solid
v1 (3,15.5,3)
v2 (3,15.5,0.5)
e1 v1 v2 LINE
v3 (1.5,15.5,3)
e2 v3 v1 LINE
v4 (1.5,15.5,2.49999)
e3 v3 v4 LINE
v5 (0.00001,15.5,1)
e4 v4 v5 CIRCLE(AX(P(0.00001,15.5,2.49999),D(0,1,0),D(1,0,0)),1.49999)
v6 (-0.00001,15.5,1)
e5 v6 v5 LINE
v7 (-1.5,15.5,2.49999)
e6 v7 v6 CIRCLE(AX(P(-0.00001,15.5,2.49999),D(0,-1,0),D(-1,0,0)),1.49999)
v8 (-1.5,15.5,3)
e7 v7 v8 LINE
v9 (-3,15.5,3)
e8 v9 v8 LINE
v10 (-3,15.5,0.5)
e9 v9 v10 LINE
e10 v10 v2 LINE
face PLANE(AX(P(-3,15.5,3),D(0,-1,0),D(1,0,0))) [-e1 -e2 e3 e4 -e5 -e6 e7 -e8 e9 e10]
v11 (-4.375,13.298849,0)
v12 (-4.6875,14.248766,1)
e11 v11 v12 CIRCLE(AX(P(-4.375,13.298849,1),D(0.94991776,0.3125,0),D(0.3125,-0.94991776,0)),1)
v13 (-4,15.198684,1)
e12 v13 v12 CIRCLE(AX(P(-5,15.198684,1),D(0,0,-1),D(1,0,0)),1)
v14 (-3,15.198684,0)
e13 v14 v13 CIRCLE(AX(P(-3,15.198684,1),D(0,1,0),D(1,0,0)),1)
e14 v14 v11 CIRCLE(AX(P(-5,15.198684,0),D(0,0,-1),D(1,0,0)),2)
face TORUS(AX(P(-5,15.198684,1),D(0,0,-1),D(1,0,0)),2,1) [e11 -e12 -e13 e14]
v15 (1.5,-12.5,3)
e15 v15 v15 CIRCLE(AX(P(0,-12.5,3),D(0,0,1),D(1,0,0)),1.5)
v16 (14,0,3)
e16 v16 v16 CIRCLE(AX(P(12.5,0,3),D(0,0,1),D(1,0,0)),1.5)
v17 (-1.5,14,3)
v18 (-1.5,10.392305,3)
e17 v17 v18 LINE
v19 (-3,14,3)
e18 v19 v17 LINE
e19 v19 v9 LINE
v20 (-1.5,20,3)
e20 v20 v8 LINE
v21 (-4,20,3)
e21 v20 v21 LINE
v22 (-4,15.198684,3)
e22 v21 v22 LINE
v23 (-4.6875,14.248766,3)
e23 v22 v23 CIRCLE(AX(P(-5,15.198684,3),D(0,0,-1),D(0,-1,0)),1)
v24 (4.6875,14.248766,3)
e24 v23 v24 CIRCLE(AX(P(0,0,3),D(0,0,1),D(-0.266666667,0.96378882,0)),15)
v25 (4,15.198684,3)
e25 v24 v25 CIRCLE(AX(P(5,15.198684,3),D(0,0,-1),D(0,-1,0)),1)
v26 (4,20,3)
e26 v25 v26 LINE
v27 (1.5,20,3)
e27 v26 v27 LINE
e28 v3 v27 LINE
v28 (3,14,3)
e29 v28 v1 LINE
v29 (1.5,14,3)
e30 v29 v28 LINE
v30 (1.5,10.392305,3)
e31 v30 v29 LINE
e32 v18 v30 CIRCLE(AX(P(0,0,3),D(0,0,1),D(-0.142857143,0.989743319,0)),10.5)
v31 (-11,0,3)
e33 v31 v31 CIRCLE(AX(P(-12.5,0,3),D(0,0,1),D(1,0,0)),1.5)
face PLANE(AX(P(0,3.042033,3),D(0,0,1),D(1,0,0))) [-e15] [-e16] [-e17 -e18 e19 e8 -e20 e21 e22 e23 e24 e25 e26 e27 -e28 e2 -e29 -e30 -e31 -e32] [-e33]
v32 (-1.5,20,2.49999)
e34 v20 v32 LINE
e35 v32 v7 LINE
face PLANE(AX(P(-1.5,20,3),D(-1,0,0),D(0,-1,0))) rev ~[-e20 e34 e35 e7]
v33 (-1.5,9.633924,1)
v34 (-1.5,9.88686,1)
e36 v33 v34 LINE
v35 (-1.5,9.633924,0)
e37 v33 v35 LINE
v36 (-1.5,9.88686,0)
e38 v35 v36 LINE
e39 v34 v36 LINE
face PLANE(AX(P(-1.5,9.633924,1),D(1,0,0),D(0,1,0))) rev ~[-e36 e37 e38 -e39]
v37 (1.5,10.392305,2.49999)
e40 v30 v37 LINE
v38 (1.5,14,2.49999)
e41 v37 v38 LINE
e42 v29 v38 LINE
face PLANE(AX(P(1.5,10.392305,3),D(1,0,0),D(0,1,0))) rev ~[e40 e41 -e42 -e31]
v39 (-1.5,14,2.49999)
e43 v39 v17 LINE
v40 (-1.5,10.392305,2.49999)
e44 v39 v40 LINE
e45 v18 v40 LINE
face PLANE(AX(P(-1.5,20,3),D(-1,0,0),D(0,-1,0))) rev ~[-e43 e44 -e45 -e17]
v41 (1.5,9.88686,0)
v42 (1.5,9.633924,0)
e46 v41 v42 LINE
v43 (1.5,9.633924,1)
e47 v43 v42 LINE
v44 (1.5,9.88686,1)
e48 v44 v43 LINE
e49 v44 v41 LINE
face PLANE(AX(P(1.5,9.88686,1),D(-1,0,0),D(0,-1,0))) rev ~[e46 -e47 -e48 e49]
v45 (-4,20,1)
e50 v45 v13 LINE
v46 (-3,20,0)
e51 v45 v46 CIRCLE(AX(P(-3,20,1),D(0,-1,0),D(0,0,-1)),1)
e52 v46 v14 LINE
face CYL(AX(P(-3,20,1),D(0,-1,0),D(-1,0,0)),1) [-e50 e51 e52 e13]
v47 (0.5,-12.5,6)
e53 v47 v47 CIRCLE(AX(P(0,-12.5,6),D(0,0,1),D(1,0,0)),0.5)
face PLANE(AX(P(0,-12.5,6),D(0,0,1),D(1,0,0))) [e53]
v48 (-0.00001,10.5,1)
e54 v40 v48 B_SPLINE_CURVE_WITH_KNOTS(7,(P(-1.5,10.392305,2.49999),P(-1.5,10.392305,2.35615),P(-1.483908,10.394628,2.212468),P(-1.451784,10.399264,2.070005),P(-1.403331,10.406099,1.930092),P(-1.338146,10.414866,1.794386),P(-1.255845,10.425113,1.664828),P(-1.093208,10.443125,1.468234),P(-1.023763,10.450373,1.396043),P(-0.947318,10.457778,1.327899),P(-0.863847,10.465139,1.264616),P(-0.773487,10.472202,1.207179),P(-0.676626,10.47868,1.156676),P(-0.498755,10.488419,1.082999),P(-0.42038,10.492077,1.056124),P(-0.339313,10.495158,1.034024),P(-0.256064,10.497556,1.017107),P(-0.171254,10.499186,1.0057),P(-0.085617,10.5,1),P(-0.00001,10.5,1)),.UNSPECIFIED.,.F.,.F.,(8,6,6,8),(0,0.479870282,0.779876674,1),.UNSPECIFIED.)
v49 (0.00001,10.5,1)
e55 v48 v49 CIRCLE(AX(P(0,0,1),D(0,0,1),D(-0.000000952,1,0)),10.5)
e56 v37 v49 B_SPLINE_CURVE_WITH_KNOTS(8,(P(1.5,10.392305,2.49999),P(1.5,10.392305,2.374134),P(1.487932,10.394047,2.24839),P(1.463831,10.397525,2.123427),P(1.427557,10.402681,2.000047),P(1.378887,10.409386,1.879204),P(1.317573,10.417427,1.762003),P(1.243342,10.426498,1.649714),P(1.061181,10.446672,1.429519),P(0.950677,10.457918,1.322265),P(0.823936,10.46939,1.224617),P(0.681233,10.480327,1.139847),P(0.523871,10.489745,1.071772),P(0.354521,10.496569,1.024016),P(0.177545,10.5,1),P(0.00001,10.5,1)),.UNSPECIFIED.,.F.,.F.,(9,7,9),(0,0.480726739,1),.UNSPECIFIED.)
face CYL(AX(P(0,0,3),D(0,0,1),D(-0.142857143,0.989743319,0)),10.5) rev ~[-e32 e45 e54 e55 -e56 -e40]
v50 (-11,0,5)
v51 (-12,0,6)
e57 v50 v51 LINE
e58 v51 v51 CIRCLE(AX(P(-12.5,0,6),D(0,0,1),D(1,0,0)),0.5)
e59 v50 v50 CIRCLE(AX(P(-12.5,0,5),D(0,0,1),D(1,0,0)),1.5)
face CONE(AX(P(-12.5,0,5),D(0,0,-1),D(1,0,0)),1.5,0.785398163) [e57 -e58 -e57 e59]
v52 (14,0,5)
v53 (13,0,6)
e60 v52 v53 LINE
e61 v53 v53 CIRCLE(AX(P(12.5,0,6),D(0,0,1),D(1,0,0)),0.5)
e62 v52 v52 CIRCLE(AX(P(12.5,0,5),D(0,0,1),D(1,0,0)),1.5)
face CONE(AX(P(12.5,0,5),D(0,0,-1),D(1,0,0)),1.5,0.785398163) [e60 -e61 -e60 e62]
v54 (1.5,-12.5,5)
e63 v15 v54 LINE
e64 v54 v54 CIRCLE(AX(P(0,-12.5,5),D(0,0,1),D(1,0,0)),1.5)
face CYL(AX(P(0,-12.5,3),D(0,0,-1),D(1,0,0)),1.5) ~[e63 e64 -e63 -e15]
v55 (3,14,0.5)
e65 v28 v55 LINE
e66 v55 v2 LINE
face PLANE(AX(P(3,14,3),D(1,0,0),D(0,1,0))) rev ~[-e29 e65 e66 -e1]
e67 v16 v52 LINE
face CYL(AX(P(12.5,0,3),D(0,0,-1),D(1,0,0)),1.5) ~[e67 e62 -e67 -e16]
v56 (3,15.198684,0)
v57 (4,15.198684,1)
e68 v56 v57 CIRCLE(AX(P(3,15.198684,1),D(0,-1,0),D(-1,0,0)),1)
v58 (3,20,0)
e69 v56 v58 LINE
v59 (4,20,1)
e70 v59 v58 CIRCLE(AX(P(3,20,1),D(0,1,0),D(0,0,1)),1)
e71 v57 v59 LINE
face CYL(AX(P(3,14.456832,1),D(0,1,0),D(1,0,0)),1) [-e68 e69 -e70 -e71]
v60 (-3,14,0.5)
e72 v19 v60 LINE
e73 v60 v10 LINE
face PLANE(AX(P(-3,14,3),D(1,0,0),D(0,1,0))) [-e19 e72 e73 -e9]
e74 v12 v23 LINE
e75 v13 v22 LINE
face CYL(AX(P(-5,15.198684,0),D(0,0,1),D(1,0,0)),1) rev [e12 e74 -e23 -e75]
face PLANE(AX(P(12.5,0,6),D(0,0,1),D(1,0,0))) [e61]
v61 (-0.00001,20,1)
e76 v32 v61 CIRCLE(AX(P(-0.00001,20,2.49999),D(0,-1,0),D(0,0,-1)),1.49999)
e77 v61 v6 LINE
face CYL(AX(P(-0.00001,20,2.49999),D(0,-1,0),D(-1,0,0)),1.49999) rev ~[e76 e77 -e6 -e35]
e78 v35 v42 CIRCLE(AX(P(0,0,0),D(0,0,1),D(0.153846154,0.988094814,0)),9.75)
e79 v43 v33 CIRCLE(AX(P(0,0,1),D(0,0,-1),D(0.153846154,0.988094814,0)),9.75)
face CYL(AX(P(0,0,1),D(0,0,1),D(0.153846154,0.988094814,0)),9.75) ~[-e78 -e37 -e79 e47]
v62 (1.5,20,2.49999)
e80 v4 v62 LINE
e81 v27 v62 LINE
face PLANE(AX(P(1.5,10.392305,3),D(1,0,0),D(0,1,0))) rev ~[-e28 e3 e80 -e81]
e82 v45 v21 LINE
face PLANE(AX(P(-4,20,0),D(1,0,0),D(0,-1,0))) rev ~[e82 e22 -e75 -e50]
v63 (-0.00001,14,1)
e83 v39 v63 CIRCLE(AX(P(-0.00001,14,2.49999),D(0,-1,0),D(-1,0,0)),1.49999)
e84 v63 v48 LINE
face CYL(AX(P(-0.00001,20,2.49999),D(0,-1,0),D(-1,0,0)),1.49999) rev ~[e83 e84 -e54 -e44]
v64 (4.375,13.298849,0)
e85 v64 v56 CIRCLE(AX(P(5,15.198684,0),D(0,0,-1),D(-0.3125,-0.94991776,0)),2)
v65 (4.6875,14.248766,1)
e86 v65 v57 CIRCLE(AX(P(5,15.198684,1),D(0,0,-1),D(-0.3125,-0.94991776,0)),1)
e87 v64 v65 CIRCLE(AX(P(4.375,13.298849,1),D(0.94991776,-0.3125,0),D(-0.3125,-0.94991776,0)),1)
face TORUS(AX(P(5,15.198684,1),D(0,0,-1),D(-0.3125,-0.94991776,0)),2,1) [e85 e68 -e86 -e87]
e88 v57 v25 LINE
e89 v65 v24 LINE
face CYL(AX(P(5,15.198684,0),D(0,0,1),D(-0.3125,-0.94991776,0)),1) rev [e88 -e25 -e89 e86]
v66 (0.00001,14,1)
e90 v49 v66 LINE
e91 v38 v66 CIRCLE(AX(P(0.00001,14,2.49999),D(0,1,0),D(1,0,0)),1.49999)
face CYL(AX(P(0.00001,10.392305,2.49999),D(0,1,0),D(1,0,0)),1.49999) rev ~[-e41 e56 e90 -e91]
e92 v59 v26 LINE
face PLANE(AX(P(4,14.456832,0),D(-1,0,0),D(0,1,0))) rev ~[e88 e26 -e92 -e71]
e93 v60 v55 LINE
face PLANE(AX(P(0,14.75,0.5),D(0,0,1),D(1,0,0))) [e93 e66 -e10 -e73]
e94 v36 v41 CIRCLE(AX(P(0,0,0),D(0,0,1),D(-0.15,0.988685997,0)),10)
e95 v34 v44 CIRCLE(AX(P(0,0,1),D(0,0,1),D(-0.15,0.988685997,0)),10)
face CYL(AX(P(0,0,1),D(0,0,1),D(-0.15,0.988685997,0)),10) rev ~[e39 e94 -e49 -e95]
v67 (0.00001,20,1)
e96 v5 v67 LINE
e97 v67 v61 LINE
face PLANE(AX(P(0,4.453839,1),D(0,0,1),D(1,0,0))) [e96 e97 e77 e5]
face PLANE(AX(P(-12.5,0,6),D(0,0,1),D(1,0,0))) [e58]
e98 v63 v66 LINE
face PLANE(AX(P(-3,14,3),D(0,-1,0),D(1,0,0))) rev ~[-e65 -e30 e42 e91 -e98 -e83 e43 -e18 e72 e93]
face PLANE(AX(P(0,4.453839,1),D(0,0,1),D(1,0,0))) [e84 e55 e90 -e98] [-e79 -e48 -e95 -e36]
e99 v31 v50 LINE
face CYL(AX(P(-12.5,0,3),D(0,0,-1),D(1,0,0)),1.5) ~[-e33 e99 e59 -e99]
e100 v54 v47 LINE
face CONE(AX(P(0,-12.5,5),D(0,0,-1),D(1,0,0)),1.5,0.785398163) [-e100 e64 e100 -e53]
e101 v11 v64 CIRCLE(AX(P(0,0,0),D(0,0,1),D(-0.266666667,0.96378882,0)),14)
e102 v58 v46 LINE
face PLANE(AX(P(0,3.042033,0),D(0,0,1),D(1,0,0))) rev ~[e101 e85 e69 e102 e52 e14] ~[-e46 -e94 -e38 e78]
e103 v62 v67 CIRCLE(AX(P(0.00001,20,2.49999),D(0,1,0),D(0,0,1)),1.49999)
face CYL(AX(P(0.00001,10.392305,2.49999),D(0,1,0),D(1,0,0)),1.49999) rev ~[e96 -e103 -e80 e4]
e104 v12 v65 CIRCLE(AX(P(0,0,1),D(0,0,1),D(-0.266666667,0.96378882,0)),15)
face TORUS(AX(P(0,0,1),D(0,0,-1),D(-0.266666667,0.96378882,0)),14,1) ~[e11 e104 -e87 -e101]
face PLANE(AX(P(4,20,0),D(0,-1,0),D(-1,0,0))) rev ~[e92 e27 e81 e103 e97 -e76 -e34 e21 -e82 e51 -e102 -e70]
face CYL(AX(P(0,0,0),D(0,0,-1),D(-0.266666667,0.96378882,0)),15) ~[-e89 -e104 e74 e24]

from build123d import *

# Parameters (mm, degrees)
F1_DEPTH  = 3
F3_DEPTH  = 2
F4_R      = 1.5
F5_DEPTH  = 3
F6_SIZE   = 1
F7_R      = 1
F9_DEPTH  = 1.0010001
F10_R     = 1.49999
F11_W     = 6
F11_H     = 1.5
F12_DEPTH = 2.5


# Not quite as in the source:
# - a fillet or chamfer is up to 0.001 mm smaller than in the source, because OpenCascade refuses the exact size


with BuildPart() as f1:
    # F0 (on Top) → F1 (new body)
    with BuildSketch(Plane.XY):
        with BuildLine():
            Line((-4, 20), (-4, 14.4568322948))
            ThreePointArc((-4, 14.4568322948), (0, -15), (4, 14.4568322948))
            Line((4, 14.4568322948), (4, 20))
            Line((4, 20), (-4, 20))
        make_face()
    extrude(amount=F1_DEPTH)

    # F2 (on face) → F3 (cut)
    with BuildSketch(Plane.XY.offset(3)):
        with BuildLine():
            Line((1.5, 20), (-1.5, 20))
            Line((-1.5, 20), (-1.5, 10.3923048454))
            ThreePointArc((-1.5, 10.3923048454), (0, -10.5), (1.5, 10.3923048454))
            Line((1.5, 10.3923048454), (1.5, 20))
        make_face()
    extrude(amount=-F3_DEPTH, mode=Mode.SUBTRACT)

    # F4 (on face) → F5 (join)
    with BuildSketch(Plane.XY.offset(3)):
        with Locations((12.5, 0)):
            Circle(F4_R)
        with Locations((-12.5, 0)):
            Circle(F4_R)
        with Locations((0, -12.5)):
            Circle(F4_R)
    extrude(amount=F5_DEPTH)

    # F6
    f6_edges = [f1.edges().sort_by_distance(p)[0] for p in [
        (-14, 0, 6),
        (-1.5, -12.5, 6),
        (11, 0, 6),
    ]]
    chamfer(f6_edges, length=F6_SIZE)

    # F7
    f7_edges = [f1.edges().sort_by_distance(p)[0] for p in [
        (4, 17.228416, 0),
        (4, 14.456832, 1.5),
        (-4, 14.456832, 1.5),
        (-4, 17.228416, 0),
        (0, -15, 0),
    ]]
    fillet(f7_edges, radius=F7_R)

    # F8 (on face) → F9 (cut, through all)
    with BuildSketch(Plane.XY.offset(1)):
        with BuildLine():
            Line((-1.5, 9.633924434), (-1.5, 9.8868599666))
            ThreePointArc((-1.5, 9.8868599666), (0, -10), (1.5, 9.8868599666))
            Line((1.5, 9.8868599666), (1.5, 9.633924434))
            ThreePointArc((1.5, 9.633924434), (0, -9.75), (-1.5, 9.633924434))
        make_face()
    extrude(amount=-F9_DEPTH, mode=Mode.SUBTRACT)

    # F10 (radius 1.5 in the source; OpenCascade refuses exactly that, so slightly less here)
    f10_edges = [f1.edges().sort_by_distance(p)[0] for p in [
        (1.5, 15.196152, 1),
        (-1.5, 15.196152, 1),
    ]]
    fillet(f10_edges, radius=F10_R)

    # F11 (on face) → F12 (cut)
    with BuildSketch(Plane.XY.offset(3)):
        with Locations((0, 14.75)):
            Rectangle(F11_W, F11_H)
    extrude(amount=-F12_DEPTH, mode=Mode.SUBTRACT)


solid = f1.part
